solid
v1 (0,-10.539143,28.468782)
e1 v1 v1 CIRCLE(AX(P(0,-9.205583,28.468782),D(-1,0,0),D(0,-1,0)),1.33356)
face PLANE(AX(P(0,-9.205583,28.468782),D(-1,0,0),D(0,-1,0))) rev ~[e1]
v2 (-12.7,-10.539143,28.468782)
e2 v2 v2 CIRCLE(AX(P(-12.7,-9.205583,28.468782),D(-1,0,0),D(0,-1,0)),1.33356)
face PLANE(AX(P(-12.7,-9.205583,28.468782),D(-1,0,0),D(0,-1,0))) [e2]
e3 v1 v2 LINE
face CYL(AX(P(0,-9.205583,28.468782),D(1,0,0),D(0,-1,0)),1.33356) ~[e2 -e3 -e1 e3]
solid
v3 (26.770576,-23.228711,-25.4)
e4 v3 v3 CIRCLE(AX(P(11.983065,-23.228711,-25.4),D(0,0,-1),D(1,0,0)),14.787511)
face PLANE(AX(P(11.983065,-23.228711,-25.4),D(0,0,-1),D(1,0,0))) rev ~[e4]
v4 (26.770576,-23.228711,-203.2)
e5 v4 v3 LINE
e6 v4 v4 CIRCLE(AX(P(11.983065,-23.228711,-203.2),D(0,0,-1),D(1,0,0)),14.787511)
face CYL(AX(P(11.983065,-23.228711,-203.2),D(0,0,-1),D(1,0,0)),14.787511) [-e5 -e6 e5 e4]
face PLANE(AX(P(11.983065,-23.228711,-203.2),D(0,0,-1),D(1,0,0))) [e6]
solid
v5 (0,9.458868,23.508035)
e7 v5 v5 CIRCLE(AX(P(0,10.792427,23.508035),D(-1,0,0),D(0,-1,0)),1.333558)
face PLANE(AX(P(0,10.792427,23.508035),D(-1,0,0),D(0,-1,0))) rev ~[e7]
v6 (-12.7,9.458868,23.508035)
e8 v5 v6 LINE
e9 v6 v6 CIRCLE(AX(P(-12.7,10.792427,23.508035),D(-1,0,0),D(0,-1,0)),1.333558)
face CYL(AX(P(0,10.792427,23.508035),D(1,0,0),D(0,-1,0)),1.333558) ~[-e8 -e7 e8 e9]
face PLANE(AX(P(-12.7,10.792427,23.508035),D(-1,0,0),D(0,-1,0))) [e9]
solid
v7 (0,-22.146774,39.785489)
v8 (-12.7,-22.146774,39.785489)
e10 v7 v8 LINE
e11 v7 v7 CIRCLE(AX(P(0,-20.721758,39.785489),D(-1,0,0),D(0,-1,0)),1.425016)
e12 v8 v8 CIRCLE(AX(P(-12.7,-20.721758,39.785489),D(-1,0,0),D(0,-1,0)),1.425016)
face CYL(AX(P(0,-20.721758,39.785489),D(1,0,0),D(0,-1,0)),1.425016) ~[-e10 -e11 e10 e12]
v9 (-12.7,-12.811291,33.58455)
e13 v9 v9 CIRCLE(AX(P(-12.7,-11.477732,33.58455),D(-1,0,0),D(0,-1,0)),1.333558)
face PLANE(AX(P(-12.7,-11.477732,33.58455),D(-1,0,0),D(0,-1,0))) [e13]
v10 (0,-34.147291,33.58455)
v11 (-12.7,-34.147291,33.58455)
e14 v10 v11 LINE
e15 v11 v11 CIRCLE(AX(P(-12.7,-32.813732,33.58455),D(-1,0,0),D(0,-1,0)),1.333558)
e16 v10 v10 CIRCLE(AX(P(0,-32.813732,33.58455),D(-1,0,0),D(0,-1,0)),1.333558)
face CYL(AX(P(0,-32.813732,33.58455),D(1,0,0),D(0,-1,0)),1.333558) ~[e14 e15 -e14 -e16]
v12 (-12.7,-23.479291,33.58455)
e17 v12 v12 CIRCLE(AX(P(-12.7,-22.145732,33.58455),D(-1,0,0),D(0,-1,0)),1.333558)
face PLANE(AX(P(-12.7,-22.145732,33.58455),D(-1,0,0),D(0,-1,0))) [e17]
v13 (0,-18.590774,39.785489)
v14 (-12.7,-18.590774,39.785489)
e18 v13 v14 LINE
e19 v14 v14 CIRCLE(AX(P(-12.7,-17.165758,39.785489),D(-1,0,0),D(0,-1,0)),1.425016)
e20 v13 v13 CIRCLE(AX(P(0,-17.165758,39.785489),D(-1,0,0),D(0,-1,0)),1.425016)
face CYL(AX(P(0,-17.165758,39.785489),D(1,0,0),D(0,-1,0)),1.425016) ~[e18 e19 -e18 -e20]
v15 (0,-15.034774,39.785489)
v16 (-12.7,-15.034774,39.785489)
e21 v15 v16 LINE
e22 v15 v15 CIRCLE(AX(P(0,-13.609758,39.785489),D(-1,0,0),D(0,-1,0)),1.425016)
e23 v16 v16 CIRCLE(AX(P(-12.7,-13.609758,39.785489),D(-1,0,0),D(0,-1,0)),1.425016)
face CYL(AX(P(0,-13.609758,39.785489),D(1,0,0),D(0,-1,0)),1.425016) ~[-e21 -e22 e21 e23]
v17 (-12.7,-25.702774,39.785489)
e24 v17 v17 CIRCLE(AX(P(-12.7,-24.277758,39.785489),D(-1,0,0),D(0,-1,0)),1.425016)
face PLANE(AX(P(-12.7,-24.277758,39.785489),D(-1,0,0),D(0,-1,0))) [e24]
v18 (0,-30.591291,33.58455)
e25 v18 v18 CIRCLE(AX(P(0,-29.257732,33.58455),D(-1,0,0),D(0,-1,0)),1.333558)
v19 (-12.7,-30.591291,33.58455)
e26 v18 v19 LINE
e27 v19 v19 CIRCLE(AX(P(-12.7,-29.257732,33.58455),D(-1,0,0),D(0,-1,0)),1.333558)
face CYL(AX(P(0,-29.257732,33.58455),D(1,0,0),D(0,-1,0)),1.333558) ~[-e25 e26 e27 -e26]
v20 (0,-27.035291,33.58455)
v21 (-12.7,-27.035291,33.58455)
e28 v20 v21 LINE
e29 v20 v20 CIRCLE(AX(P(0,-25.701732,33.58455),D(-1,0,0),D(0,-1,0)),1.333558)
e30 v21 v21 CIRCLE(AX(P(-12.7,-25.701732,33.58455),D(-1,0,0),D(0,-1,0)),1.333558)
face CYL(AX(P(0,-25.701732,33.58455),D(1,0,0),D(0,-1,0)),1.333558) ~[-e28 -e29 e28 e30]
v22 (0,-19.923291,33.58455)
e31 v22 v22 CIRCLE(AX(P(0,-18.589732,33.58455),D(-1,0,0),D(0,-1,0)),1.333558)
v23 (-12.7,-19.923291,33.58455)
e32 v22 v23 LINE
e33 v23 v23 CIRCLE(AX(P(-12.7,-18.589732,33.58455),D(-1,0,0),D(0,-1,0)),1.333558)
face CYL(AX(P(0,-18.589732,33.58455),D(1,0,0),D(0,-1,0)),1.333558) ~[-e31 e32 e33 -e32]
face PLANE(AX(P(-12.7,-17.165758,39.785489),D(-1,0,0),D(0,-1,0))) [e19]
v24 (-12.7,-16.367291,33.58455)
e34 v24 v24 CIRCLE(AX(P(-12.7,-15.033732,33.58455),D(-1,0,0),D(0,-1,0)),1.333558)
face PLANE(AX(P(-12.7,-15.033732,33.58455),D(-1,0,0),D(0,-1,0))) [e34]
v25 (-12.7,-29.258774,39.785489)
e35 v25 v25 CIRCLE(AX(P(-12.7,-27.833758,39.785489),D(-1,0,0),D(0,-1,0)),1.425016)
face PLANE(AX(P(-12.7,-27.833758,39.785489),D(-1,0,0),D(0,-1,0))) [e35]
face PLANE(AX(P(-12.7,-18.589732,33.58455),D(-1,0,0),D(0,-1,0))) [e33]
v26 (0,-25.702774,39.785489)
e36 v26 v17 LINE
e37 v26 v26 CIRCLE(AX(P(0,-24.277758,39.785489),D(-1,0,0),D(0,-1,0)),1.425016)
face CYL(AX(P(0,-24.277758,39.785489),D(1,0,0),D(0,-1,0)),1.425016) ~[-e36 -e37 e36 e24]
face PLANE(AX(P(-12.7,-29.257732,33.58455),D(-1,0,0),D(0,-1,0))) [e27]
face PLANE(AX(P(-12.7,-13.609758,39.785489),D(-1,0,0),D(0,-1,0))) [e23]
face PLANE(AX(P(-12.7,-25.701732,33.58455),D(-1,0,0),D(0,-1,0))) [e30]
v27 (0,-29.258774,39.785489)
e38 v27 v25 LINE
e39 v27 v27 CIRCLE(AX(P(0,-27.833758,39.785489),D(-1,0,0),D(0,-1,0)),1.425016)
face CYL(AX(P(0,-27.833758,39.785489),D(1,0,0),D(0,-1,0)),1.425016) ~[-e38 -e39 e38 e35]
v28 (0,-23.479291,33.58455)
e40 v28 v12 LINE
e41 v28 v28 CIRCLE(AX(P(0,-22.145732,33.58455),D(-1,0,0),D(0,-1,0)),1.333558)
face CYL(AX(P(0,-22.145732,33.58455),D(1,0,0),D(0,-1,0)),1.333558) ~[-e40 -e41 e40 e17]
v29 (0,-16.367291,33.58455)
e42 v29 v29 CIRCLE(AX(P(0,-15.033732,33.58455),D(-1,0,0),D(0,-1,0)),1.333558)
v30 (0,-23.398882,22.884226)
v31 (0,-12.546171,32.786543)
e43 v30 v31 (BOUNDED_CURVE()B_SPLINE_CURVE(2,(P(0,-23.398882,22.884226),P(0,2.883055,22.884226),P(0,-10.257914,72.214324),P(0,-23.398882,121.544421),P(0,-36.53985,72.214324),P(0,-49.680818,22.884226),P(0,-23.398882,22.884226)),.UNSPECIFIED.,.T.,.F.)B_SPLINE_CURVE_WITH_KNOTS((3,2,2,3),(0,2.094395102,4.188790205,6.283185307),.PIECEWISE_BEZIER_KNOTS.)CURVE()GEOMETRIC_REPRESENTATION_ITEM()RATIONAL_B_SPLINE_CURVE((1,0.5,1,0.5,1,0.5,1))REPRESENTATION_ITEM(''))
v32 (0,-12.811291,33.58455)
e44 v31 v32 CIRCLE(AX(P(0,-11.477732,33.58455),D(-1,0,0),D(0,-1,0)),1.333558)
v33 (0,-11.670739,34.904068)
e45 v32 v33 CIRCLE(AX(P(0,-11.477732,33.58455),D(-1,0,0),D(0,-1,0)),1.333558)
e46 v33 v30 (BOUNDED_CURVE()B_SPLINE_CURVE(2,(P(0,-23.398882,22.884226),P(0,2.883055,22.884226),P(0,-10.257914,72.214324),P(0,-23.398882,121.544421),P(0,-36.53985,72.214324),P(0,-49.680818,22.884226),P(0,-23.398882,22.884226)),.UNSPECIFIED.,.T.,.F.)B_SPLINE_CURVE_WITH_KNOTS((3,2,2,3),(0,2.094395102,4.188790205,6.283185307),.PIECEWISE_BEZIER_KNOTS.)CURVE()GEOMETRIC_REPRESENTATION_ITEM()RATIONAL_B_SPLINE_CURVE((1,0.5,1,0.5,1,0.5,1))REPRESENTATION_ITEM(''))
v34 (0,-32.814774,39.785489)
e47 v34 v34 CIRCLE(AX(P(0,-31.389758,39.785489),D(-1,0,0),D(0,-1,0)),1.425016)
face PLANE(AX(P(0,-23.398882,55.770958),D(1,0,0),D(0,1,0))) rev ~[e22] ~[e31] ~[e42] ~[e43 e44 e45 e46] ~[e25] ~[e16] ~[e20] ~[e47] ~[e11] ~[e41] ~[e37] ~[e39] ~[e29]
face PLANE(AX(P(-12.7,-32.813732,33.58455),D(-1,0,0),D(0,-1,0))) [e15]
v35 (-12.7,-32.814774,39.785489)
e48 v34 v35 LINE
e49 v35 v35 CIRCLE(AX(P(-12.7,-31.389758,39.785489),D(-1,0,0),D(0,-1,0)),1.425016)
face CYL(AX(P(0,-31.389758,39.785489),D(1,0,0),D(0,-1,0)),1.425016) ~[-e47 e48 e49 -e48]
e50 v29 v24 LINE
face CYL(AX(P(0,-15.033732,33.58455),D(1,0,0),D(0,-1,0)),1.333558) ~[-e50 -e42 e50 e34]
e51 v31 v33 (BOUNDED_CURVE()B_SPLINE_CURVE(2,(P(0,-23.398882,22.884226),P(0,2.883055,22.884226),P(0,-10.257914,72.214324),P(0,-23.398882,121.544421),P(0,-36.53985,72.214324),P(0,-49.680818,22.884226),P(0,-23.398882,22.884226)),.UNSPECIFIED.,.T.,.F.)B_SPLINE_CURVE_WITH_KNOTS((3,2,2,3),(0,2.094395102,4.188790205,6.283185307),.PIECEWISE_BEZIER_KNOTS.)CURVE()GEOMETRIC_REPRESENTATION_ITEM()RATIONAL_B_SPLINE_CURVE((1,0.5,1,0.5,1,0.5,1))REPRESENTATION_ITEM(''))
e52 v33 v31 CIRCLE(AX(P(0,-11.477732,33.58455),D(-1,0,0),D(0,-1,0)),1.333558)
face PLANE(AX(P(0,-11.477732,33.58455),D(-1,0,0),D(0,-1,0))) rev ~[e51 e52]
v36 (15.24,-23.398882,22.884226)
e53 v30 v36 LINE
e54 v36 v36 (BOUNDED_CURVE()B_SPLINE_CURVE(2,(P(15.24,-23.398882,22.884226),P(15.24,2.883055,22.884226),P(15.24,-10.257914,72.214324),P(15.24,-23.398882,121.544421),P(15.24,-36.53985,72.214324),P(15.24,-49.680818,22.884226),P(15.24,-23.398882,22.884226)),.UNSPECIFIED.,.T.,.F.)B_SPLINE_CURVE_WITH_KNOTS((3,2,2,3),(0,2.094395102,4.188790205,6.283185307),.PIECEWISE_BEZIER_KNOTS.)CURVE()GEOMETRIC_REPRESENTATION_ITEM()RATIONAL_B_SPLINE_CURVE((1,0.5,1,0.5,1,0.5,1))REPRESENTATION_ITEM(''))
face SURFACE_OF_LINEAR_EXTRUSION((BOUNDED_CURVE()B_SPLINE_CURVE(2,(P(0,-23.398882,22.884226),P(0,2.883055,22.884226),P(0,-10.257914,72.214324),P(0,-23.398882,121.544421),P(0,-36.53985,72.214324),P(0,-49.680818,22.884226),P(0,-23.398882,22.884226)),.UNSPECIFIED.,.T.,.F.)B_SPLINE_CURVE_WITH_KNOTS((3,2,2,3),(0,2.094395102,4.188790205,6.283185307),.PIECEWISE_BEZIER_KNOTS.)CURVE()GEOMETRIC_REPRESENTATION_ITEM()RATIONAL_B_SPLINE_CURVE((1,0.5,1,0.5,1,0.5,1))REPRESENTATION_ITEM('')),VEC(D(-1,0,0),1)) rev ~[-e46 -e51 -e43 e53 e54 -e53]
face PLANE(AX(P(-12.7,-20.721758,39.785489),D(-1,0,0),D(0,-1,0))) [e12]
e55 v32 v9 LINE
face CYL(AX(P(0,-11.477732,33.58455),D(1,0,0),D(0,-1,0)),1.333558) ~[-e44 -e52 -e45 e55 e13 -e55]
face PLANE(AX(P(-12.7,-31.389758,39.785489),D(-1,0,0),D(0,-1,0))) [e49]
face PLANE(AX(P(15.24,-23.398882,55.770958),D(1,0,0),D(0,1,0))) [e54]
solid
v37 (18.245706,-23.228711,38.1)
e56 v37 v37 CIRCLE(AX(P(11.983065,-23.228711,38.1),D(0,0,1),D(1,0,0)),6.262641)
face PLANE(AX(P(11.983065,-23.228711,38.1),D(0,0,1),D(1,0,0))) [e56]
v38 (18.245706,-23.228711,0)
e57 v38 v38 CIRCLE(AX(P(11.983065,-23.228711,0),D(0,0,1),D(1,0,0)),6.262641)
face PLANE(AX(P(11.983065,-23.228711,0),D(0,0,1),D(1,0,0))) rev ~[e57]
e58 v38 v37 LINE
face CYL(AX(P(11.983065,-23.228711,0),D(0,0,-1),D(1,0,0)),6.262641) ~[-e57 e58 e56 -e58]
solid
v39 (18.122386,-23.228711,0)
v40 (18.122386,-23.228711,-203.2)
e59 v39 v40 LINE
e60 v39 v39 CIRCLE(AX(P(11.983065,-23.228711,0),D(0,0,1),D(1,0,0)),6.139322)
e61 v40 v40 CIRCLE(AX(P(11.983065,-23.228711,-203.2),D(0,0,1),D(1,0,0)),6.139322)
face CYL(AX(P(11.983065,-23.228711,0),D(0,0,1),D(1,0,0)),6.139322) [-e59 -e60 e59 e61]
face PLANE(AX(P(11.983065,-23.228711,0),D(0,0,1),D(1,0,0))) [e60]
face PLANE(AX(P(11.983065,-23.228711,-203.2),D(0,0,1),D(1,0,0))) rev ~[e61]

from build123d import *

# Parameters (mm, degrees)
F1_DEPTH = 15.24
F2_R     = 6.1393215521
F3_DEPTH = 203.2
F4_R     = 1.4250163951
F4_R_2   = 1.3335584615
F5_DEPTH = 12.7
F4_R_3   = 1.3335599772
F6_R     = 14.7875106542
F7_DEPTH = 177.8
F8_R     = 6.2626412316
F9_DEPTH = 38.1


with BuildPart() as f1:
    # F0 (on Right) → F1 (new body)
    with BuildSketch(Plane.YZ):
        with BuildLine():
            add(Edge.make_bspline(
                [(-23.3988817781, 22.8842264041), (2.8830545158, 22.8842264041), (-10.2579136311, 72.2143235616), (-23.3988817781, 121.5444207191), (-36.5398499251, 72.2143235616), (-49.6808180721, 22.8842264041), (-23.3988817781, 22.8842264041)],
                knots=[0, 0, 0, 2.0943951024, 2.0943951024, 4.1887902048, 4.1887902048, 6.2831853072, 6.2831853072, 6.2831853072], degree=2, weights=[1, 0.5, 1, 0.5, 1, 0.5, 1]))
        make_face()
    extrude(amount=F1_DEPTH)

    # F4 (on face) → F5 (join)
    with BuildSketch(Plane(origin=(0, 0, 0), x_dir=(0, -1, 0), z_dir=(-1, 0, 0))):
        with Locations((13.6097577012, 39.78548944)):
            Circle(F4_R)
        with Locations((17.1657577012, 39.78548944)):
            Circle(F4_R)
        with Locations((20.7217577012, 39.78548944)):
            Circle(F4_R)
        with Locations((24.2777577012, 39.78548944)):
            Circle(F4_R)
        with Locations((27.8337577012, 39.78548944)):
            Circle(F4_R)
        with Locations((31.3897577012, 39.78548944)):
            Circle(F4_R)
        with Locations((11.4777320996, 33.5845500231)):
            Circle(F4_R_2)
        with Locations((15.0337320996, 33.5845500231)):
            Circle(F4_R_2)
        with Locations((18.5897320996, 33.5845500231)):
            Circle(F4_R_2)
        with Locations((22.1457320996, 33.5845500231)):
            Circle(F4_R_2)
        with Locations((25.7017320996, 33.5845500231)):
            Circle(F4_R_2)
        with Locations((29.2577320996, 33.5845500231)):
            Circle(F4_R_2)
        with Locations((32.8137320996, 33.5845500231)):
            Circle(F4_R_2)
    extrude(amount=F5_DEPTH)


with BuildPart() as f3:
    # F2 (on Top) → F3 (new body)
    with BuildSketch(Plane.XY):
        with Locations((11.9830649346, -23.2287105173)):
            Circle(F2_R)
    extrude(amount=-F3_DEPTH)


with BuildPart() as f5:
    # F4 (on face) → F5, piece 2 (new body)
    with BuildSketch(Plane(origin=(0, 0, 0), x_dir=(0, -1, 0), z_dir=(-1, 0, 0))):
        with Locations((9.205583483, 28.4687820822)):
            Circle(F4_R_3)
    extrude(amount=F5_DEPTH)


with BuildPart() as f5b:
    # F4 (on face) → F5, piece 3 (new body)
    with BuildSketch(Plane(origin=(0, 0, 0), x_dir=(0, -1, 0), z_dir=(-1, 0, 0))):
        with Locations((-10.792426765, 23.5080346465)):
            Circle(F4_R_2)
    extrude(amount=F5_DEPTH)


with BuildPart() as f7:
    # F6 (on face) → F7 (new body)
    with BuildSketch(Plane(origin=(0, 0, -203.2), x_dir=(1, 0, 0), z_dir=(0, 0, -1))):
        with Locations((11.9830649346, 23.2287105173)):
            Circle(F6_R)
    extrude(amount=-F7_DEPTH)


with BuildPart() as f9:
    # F8 (on face) → F9 (new body)
    with BuildSketch(Plane.XY):
        with Locations((11.9830649346, -23.2287105173)):
            Circle(F8_R)
    extrude(amount=F9_DEPTH)


solid = Compound([f1.part, f3.part, f5.part, f5b.part, f7.part, f9.part])
